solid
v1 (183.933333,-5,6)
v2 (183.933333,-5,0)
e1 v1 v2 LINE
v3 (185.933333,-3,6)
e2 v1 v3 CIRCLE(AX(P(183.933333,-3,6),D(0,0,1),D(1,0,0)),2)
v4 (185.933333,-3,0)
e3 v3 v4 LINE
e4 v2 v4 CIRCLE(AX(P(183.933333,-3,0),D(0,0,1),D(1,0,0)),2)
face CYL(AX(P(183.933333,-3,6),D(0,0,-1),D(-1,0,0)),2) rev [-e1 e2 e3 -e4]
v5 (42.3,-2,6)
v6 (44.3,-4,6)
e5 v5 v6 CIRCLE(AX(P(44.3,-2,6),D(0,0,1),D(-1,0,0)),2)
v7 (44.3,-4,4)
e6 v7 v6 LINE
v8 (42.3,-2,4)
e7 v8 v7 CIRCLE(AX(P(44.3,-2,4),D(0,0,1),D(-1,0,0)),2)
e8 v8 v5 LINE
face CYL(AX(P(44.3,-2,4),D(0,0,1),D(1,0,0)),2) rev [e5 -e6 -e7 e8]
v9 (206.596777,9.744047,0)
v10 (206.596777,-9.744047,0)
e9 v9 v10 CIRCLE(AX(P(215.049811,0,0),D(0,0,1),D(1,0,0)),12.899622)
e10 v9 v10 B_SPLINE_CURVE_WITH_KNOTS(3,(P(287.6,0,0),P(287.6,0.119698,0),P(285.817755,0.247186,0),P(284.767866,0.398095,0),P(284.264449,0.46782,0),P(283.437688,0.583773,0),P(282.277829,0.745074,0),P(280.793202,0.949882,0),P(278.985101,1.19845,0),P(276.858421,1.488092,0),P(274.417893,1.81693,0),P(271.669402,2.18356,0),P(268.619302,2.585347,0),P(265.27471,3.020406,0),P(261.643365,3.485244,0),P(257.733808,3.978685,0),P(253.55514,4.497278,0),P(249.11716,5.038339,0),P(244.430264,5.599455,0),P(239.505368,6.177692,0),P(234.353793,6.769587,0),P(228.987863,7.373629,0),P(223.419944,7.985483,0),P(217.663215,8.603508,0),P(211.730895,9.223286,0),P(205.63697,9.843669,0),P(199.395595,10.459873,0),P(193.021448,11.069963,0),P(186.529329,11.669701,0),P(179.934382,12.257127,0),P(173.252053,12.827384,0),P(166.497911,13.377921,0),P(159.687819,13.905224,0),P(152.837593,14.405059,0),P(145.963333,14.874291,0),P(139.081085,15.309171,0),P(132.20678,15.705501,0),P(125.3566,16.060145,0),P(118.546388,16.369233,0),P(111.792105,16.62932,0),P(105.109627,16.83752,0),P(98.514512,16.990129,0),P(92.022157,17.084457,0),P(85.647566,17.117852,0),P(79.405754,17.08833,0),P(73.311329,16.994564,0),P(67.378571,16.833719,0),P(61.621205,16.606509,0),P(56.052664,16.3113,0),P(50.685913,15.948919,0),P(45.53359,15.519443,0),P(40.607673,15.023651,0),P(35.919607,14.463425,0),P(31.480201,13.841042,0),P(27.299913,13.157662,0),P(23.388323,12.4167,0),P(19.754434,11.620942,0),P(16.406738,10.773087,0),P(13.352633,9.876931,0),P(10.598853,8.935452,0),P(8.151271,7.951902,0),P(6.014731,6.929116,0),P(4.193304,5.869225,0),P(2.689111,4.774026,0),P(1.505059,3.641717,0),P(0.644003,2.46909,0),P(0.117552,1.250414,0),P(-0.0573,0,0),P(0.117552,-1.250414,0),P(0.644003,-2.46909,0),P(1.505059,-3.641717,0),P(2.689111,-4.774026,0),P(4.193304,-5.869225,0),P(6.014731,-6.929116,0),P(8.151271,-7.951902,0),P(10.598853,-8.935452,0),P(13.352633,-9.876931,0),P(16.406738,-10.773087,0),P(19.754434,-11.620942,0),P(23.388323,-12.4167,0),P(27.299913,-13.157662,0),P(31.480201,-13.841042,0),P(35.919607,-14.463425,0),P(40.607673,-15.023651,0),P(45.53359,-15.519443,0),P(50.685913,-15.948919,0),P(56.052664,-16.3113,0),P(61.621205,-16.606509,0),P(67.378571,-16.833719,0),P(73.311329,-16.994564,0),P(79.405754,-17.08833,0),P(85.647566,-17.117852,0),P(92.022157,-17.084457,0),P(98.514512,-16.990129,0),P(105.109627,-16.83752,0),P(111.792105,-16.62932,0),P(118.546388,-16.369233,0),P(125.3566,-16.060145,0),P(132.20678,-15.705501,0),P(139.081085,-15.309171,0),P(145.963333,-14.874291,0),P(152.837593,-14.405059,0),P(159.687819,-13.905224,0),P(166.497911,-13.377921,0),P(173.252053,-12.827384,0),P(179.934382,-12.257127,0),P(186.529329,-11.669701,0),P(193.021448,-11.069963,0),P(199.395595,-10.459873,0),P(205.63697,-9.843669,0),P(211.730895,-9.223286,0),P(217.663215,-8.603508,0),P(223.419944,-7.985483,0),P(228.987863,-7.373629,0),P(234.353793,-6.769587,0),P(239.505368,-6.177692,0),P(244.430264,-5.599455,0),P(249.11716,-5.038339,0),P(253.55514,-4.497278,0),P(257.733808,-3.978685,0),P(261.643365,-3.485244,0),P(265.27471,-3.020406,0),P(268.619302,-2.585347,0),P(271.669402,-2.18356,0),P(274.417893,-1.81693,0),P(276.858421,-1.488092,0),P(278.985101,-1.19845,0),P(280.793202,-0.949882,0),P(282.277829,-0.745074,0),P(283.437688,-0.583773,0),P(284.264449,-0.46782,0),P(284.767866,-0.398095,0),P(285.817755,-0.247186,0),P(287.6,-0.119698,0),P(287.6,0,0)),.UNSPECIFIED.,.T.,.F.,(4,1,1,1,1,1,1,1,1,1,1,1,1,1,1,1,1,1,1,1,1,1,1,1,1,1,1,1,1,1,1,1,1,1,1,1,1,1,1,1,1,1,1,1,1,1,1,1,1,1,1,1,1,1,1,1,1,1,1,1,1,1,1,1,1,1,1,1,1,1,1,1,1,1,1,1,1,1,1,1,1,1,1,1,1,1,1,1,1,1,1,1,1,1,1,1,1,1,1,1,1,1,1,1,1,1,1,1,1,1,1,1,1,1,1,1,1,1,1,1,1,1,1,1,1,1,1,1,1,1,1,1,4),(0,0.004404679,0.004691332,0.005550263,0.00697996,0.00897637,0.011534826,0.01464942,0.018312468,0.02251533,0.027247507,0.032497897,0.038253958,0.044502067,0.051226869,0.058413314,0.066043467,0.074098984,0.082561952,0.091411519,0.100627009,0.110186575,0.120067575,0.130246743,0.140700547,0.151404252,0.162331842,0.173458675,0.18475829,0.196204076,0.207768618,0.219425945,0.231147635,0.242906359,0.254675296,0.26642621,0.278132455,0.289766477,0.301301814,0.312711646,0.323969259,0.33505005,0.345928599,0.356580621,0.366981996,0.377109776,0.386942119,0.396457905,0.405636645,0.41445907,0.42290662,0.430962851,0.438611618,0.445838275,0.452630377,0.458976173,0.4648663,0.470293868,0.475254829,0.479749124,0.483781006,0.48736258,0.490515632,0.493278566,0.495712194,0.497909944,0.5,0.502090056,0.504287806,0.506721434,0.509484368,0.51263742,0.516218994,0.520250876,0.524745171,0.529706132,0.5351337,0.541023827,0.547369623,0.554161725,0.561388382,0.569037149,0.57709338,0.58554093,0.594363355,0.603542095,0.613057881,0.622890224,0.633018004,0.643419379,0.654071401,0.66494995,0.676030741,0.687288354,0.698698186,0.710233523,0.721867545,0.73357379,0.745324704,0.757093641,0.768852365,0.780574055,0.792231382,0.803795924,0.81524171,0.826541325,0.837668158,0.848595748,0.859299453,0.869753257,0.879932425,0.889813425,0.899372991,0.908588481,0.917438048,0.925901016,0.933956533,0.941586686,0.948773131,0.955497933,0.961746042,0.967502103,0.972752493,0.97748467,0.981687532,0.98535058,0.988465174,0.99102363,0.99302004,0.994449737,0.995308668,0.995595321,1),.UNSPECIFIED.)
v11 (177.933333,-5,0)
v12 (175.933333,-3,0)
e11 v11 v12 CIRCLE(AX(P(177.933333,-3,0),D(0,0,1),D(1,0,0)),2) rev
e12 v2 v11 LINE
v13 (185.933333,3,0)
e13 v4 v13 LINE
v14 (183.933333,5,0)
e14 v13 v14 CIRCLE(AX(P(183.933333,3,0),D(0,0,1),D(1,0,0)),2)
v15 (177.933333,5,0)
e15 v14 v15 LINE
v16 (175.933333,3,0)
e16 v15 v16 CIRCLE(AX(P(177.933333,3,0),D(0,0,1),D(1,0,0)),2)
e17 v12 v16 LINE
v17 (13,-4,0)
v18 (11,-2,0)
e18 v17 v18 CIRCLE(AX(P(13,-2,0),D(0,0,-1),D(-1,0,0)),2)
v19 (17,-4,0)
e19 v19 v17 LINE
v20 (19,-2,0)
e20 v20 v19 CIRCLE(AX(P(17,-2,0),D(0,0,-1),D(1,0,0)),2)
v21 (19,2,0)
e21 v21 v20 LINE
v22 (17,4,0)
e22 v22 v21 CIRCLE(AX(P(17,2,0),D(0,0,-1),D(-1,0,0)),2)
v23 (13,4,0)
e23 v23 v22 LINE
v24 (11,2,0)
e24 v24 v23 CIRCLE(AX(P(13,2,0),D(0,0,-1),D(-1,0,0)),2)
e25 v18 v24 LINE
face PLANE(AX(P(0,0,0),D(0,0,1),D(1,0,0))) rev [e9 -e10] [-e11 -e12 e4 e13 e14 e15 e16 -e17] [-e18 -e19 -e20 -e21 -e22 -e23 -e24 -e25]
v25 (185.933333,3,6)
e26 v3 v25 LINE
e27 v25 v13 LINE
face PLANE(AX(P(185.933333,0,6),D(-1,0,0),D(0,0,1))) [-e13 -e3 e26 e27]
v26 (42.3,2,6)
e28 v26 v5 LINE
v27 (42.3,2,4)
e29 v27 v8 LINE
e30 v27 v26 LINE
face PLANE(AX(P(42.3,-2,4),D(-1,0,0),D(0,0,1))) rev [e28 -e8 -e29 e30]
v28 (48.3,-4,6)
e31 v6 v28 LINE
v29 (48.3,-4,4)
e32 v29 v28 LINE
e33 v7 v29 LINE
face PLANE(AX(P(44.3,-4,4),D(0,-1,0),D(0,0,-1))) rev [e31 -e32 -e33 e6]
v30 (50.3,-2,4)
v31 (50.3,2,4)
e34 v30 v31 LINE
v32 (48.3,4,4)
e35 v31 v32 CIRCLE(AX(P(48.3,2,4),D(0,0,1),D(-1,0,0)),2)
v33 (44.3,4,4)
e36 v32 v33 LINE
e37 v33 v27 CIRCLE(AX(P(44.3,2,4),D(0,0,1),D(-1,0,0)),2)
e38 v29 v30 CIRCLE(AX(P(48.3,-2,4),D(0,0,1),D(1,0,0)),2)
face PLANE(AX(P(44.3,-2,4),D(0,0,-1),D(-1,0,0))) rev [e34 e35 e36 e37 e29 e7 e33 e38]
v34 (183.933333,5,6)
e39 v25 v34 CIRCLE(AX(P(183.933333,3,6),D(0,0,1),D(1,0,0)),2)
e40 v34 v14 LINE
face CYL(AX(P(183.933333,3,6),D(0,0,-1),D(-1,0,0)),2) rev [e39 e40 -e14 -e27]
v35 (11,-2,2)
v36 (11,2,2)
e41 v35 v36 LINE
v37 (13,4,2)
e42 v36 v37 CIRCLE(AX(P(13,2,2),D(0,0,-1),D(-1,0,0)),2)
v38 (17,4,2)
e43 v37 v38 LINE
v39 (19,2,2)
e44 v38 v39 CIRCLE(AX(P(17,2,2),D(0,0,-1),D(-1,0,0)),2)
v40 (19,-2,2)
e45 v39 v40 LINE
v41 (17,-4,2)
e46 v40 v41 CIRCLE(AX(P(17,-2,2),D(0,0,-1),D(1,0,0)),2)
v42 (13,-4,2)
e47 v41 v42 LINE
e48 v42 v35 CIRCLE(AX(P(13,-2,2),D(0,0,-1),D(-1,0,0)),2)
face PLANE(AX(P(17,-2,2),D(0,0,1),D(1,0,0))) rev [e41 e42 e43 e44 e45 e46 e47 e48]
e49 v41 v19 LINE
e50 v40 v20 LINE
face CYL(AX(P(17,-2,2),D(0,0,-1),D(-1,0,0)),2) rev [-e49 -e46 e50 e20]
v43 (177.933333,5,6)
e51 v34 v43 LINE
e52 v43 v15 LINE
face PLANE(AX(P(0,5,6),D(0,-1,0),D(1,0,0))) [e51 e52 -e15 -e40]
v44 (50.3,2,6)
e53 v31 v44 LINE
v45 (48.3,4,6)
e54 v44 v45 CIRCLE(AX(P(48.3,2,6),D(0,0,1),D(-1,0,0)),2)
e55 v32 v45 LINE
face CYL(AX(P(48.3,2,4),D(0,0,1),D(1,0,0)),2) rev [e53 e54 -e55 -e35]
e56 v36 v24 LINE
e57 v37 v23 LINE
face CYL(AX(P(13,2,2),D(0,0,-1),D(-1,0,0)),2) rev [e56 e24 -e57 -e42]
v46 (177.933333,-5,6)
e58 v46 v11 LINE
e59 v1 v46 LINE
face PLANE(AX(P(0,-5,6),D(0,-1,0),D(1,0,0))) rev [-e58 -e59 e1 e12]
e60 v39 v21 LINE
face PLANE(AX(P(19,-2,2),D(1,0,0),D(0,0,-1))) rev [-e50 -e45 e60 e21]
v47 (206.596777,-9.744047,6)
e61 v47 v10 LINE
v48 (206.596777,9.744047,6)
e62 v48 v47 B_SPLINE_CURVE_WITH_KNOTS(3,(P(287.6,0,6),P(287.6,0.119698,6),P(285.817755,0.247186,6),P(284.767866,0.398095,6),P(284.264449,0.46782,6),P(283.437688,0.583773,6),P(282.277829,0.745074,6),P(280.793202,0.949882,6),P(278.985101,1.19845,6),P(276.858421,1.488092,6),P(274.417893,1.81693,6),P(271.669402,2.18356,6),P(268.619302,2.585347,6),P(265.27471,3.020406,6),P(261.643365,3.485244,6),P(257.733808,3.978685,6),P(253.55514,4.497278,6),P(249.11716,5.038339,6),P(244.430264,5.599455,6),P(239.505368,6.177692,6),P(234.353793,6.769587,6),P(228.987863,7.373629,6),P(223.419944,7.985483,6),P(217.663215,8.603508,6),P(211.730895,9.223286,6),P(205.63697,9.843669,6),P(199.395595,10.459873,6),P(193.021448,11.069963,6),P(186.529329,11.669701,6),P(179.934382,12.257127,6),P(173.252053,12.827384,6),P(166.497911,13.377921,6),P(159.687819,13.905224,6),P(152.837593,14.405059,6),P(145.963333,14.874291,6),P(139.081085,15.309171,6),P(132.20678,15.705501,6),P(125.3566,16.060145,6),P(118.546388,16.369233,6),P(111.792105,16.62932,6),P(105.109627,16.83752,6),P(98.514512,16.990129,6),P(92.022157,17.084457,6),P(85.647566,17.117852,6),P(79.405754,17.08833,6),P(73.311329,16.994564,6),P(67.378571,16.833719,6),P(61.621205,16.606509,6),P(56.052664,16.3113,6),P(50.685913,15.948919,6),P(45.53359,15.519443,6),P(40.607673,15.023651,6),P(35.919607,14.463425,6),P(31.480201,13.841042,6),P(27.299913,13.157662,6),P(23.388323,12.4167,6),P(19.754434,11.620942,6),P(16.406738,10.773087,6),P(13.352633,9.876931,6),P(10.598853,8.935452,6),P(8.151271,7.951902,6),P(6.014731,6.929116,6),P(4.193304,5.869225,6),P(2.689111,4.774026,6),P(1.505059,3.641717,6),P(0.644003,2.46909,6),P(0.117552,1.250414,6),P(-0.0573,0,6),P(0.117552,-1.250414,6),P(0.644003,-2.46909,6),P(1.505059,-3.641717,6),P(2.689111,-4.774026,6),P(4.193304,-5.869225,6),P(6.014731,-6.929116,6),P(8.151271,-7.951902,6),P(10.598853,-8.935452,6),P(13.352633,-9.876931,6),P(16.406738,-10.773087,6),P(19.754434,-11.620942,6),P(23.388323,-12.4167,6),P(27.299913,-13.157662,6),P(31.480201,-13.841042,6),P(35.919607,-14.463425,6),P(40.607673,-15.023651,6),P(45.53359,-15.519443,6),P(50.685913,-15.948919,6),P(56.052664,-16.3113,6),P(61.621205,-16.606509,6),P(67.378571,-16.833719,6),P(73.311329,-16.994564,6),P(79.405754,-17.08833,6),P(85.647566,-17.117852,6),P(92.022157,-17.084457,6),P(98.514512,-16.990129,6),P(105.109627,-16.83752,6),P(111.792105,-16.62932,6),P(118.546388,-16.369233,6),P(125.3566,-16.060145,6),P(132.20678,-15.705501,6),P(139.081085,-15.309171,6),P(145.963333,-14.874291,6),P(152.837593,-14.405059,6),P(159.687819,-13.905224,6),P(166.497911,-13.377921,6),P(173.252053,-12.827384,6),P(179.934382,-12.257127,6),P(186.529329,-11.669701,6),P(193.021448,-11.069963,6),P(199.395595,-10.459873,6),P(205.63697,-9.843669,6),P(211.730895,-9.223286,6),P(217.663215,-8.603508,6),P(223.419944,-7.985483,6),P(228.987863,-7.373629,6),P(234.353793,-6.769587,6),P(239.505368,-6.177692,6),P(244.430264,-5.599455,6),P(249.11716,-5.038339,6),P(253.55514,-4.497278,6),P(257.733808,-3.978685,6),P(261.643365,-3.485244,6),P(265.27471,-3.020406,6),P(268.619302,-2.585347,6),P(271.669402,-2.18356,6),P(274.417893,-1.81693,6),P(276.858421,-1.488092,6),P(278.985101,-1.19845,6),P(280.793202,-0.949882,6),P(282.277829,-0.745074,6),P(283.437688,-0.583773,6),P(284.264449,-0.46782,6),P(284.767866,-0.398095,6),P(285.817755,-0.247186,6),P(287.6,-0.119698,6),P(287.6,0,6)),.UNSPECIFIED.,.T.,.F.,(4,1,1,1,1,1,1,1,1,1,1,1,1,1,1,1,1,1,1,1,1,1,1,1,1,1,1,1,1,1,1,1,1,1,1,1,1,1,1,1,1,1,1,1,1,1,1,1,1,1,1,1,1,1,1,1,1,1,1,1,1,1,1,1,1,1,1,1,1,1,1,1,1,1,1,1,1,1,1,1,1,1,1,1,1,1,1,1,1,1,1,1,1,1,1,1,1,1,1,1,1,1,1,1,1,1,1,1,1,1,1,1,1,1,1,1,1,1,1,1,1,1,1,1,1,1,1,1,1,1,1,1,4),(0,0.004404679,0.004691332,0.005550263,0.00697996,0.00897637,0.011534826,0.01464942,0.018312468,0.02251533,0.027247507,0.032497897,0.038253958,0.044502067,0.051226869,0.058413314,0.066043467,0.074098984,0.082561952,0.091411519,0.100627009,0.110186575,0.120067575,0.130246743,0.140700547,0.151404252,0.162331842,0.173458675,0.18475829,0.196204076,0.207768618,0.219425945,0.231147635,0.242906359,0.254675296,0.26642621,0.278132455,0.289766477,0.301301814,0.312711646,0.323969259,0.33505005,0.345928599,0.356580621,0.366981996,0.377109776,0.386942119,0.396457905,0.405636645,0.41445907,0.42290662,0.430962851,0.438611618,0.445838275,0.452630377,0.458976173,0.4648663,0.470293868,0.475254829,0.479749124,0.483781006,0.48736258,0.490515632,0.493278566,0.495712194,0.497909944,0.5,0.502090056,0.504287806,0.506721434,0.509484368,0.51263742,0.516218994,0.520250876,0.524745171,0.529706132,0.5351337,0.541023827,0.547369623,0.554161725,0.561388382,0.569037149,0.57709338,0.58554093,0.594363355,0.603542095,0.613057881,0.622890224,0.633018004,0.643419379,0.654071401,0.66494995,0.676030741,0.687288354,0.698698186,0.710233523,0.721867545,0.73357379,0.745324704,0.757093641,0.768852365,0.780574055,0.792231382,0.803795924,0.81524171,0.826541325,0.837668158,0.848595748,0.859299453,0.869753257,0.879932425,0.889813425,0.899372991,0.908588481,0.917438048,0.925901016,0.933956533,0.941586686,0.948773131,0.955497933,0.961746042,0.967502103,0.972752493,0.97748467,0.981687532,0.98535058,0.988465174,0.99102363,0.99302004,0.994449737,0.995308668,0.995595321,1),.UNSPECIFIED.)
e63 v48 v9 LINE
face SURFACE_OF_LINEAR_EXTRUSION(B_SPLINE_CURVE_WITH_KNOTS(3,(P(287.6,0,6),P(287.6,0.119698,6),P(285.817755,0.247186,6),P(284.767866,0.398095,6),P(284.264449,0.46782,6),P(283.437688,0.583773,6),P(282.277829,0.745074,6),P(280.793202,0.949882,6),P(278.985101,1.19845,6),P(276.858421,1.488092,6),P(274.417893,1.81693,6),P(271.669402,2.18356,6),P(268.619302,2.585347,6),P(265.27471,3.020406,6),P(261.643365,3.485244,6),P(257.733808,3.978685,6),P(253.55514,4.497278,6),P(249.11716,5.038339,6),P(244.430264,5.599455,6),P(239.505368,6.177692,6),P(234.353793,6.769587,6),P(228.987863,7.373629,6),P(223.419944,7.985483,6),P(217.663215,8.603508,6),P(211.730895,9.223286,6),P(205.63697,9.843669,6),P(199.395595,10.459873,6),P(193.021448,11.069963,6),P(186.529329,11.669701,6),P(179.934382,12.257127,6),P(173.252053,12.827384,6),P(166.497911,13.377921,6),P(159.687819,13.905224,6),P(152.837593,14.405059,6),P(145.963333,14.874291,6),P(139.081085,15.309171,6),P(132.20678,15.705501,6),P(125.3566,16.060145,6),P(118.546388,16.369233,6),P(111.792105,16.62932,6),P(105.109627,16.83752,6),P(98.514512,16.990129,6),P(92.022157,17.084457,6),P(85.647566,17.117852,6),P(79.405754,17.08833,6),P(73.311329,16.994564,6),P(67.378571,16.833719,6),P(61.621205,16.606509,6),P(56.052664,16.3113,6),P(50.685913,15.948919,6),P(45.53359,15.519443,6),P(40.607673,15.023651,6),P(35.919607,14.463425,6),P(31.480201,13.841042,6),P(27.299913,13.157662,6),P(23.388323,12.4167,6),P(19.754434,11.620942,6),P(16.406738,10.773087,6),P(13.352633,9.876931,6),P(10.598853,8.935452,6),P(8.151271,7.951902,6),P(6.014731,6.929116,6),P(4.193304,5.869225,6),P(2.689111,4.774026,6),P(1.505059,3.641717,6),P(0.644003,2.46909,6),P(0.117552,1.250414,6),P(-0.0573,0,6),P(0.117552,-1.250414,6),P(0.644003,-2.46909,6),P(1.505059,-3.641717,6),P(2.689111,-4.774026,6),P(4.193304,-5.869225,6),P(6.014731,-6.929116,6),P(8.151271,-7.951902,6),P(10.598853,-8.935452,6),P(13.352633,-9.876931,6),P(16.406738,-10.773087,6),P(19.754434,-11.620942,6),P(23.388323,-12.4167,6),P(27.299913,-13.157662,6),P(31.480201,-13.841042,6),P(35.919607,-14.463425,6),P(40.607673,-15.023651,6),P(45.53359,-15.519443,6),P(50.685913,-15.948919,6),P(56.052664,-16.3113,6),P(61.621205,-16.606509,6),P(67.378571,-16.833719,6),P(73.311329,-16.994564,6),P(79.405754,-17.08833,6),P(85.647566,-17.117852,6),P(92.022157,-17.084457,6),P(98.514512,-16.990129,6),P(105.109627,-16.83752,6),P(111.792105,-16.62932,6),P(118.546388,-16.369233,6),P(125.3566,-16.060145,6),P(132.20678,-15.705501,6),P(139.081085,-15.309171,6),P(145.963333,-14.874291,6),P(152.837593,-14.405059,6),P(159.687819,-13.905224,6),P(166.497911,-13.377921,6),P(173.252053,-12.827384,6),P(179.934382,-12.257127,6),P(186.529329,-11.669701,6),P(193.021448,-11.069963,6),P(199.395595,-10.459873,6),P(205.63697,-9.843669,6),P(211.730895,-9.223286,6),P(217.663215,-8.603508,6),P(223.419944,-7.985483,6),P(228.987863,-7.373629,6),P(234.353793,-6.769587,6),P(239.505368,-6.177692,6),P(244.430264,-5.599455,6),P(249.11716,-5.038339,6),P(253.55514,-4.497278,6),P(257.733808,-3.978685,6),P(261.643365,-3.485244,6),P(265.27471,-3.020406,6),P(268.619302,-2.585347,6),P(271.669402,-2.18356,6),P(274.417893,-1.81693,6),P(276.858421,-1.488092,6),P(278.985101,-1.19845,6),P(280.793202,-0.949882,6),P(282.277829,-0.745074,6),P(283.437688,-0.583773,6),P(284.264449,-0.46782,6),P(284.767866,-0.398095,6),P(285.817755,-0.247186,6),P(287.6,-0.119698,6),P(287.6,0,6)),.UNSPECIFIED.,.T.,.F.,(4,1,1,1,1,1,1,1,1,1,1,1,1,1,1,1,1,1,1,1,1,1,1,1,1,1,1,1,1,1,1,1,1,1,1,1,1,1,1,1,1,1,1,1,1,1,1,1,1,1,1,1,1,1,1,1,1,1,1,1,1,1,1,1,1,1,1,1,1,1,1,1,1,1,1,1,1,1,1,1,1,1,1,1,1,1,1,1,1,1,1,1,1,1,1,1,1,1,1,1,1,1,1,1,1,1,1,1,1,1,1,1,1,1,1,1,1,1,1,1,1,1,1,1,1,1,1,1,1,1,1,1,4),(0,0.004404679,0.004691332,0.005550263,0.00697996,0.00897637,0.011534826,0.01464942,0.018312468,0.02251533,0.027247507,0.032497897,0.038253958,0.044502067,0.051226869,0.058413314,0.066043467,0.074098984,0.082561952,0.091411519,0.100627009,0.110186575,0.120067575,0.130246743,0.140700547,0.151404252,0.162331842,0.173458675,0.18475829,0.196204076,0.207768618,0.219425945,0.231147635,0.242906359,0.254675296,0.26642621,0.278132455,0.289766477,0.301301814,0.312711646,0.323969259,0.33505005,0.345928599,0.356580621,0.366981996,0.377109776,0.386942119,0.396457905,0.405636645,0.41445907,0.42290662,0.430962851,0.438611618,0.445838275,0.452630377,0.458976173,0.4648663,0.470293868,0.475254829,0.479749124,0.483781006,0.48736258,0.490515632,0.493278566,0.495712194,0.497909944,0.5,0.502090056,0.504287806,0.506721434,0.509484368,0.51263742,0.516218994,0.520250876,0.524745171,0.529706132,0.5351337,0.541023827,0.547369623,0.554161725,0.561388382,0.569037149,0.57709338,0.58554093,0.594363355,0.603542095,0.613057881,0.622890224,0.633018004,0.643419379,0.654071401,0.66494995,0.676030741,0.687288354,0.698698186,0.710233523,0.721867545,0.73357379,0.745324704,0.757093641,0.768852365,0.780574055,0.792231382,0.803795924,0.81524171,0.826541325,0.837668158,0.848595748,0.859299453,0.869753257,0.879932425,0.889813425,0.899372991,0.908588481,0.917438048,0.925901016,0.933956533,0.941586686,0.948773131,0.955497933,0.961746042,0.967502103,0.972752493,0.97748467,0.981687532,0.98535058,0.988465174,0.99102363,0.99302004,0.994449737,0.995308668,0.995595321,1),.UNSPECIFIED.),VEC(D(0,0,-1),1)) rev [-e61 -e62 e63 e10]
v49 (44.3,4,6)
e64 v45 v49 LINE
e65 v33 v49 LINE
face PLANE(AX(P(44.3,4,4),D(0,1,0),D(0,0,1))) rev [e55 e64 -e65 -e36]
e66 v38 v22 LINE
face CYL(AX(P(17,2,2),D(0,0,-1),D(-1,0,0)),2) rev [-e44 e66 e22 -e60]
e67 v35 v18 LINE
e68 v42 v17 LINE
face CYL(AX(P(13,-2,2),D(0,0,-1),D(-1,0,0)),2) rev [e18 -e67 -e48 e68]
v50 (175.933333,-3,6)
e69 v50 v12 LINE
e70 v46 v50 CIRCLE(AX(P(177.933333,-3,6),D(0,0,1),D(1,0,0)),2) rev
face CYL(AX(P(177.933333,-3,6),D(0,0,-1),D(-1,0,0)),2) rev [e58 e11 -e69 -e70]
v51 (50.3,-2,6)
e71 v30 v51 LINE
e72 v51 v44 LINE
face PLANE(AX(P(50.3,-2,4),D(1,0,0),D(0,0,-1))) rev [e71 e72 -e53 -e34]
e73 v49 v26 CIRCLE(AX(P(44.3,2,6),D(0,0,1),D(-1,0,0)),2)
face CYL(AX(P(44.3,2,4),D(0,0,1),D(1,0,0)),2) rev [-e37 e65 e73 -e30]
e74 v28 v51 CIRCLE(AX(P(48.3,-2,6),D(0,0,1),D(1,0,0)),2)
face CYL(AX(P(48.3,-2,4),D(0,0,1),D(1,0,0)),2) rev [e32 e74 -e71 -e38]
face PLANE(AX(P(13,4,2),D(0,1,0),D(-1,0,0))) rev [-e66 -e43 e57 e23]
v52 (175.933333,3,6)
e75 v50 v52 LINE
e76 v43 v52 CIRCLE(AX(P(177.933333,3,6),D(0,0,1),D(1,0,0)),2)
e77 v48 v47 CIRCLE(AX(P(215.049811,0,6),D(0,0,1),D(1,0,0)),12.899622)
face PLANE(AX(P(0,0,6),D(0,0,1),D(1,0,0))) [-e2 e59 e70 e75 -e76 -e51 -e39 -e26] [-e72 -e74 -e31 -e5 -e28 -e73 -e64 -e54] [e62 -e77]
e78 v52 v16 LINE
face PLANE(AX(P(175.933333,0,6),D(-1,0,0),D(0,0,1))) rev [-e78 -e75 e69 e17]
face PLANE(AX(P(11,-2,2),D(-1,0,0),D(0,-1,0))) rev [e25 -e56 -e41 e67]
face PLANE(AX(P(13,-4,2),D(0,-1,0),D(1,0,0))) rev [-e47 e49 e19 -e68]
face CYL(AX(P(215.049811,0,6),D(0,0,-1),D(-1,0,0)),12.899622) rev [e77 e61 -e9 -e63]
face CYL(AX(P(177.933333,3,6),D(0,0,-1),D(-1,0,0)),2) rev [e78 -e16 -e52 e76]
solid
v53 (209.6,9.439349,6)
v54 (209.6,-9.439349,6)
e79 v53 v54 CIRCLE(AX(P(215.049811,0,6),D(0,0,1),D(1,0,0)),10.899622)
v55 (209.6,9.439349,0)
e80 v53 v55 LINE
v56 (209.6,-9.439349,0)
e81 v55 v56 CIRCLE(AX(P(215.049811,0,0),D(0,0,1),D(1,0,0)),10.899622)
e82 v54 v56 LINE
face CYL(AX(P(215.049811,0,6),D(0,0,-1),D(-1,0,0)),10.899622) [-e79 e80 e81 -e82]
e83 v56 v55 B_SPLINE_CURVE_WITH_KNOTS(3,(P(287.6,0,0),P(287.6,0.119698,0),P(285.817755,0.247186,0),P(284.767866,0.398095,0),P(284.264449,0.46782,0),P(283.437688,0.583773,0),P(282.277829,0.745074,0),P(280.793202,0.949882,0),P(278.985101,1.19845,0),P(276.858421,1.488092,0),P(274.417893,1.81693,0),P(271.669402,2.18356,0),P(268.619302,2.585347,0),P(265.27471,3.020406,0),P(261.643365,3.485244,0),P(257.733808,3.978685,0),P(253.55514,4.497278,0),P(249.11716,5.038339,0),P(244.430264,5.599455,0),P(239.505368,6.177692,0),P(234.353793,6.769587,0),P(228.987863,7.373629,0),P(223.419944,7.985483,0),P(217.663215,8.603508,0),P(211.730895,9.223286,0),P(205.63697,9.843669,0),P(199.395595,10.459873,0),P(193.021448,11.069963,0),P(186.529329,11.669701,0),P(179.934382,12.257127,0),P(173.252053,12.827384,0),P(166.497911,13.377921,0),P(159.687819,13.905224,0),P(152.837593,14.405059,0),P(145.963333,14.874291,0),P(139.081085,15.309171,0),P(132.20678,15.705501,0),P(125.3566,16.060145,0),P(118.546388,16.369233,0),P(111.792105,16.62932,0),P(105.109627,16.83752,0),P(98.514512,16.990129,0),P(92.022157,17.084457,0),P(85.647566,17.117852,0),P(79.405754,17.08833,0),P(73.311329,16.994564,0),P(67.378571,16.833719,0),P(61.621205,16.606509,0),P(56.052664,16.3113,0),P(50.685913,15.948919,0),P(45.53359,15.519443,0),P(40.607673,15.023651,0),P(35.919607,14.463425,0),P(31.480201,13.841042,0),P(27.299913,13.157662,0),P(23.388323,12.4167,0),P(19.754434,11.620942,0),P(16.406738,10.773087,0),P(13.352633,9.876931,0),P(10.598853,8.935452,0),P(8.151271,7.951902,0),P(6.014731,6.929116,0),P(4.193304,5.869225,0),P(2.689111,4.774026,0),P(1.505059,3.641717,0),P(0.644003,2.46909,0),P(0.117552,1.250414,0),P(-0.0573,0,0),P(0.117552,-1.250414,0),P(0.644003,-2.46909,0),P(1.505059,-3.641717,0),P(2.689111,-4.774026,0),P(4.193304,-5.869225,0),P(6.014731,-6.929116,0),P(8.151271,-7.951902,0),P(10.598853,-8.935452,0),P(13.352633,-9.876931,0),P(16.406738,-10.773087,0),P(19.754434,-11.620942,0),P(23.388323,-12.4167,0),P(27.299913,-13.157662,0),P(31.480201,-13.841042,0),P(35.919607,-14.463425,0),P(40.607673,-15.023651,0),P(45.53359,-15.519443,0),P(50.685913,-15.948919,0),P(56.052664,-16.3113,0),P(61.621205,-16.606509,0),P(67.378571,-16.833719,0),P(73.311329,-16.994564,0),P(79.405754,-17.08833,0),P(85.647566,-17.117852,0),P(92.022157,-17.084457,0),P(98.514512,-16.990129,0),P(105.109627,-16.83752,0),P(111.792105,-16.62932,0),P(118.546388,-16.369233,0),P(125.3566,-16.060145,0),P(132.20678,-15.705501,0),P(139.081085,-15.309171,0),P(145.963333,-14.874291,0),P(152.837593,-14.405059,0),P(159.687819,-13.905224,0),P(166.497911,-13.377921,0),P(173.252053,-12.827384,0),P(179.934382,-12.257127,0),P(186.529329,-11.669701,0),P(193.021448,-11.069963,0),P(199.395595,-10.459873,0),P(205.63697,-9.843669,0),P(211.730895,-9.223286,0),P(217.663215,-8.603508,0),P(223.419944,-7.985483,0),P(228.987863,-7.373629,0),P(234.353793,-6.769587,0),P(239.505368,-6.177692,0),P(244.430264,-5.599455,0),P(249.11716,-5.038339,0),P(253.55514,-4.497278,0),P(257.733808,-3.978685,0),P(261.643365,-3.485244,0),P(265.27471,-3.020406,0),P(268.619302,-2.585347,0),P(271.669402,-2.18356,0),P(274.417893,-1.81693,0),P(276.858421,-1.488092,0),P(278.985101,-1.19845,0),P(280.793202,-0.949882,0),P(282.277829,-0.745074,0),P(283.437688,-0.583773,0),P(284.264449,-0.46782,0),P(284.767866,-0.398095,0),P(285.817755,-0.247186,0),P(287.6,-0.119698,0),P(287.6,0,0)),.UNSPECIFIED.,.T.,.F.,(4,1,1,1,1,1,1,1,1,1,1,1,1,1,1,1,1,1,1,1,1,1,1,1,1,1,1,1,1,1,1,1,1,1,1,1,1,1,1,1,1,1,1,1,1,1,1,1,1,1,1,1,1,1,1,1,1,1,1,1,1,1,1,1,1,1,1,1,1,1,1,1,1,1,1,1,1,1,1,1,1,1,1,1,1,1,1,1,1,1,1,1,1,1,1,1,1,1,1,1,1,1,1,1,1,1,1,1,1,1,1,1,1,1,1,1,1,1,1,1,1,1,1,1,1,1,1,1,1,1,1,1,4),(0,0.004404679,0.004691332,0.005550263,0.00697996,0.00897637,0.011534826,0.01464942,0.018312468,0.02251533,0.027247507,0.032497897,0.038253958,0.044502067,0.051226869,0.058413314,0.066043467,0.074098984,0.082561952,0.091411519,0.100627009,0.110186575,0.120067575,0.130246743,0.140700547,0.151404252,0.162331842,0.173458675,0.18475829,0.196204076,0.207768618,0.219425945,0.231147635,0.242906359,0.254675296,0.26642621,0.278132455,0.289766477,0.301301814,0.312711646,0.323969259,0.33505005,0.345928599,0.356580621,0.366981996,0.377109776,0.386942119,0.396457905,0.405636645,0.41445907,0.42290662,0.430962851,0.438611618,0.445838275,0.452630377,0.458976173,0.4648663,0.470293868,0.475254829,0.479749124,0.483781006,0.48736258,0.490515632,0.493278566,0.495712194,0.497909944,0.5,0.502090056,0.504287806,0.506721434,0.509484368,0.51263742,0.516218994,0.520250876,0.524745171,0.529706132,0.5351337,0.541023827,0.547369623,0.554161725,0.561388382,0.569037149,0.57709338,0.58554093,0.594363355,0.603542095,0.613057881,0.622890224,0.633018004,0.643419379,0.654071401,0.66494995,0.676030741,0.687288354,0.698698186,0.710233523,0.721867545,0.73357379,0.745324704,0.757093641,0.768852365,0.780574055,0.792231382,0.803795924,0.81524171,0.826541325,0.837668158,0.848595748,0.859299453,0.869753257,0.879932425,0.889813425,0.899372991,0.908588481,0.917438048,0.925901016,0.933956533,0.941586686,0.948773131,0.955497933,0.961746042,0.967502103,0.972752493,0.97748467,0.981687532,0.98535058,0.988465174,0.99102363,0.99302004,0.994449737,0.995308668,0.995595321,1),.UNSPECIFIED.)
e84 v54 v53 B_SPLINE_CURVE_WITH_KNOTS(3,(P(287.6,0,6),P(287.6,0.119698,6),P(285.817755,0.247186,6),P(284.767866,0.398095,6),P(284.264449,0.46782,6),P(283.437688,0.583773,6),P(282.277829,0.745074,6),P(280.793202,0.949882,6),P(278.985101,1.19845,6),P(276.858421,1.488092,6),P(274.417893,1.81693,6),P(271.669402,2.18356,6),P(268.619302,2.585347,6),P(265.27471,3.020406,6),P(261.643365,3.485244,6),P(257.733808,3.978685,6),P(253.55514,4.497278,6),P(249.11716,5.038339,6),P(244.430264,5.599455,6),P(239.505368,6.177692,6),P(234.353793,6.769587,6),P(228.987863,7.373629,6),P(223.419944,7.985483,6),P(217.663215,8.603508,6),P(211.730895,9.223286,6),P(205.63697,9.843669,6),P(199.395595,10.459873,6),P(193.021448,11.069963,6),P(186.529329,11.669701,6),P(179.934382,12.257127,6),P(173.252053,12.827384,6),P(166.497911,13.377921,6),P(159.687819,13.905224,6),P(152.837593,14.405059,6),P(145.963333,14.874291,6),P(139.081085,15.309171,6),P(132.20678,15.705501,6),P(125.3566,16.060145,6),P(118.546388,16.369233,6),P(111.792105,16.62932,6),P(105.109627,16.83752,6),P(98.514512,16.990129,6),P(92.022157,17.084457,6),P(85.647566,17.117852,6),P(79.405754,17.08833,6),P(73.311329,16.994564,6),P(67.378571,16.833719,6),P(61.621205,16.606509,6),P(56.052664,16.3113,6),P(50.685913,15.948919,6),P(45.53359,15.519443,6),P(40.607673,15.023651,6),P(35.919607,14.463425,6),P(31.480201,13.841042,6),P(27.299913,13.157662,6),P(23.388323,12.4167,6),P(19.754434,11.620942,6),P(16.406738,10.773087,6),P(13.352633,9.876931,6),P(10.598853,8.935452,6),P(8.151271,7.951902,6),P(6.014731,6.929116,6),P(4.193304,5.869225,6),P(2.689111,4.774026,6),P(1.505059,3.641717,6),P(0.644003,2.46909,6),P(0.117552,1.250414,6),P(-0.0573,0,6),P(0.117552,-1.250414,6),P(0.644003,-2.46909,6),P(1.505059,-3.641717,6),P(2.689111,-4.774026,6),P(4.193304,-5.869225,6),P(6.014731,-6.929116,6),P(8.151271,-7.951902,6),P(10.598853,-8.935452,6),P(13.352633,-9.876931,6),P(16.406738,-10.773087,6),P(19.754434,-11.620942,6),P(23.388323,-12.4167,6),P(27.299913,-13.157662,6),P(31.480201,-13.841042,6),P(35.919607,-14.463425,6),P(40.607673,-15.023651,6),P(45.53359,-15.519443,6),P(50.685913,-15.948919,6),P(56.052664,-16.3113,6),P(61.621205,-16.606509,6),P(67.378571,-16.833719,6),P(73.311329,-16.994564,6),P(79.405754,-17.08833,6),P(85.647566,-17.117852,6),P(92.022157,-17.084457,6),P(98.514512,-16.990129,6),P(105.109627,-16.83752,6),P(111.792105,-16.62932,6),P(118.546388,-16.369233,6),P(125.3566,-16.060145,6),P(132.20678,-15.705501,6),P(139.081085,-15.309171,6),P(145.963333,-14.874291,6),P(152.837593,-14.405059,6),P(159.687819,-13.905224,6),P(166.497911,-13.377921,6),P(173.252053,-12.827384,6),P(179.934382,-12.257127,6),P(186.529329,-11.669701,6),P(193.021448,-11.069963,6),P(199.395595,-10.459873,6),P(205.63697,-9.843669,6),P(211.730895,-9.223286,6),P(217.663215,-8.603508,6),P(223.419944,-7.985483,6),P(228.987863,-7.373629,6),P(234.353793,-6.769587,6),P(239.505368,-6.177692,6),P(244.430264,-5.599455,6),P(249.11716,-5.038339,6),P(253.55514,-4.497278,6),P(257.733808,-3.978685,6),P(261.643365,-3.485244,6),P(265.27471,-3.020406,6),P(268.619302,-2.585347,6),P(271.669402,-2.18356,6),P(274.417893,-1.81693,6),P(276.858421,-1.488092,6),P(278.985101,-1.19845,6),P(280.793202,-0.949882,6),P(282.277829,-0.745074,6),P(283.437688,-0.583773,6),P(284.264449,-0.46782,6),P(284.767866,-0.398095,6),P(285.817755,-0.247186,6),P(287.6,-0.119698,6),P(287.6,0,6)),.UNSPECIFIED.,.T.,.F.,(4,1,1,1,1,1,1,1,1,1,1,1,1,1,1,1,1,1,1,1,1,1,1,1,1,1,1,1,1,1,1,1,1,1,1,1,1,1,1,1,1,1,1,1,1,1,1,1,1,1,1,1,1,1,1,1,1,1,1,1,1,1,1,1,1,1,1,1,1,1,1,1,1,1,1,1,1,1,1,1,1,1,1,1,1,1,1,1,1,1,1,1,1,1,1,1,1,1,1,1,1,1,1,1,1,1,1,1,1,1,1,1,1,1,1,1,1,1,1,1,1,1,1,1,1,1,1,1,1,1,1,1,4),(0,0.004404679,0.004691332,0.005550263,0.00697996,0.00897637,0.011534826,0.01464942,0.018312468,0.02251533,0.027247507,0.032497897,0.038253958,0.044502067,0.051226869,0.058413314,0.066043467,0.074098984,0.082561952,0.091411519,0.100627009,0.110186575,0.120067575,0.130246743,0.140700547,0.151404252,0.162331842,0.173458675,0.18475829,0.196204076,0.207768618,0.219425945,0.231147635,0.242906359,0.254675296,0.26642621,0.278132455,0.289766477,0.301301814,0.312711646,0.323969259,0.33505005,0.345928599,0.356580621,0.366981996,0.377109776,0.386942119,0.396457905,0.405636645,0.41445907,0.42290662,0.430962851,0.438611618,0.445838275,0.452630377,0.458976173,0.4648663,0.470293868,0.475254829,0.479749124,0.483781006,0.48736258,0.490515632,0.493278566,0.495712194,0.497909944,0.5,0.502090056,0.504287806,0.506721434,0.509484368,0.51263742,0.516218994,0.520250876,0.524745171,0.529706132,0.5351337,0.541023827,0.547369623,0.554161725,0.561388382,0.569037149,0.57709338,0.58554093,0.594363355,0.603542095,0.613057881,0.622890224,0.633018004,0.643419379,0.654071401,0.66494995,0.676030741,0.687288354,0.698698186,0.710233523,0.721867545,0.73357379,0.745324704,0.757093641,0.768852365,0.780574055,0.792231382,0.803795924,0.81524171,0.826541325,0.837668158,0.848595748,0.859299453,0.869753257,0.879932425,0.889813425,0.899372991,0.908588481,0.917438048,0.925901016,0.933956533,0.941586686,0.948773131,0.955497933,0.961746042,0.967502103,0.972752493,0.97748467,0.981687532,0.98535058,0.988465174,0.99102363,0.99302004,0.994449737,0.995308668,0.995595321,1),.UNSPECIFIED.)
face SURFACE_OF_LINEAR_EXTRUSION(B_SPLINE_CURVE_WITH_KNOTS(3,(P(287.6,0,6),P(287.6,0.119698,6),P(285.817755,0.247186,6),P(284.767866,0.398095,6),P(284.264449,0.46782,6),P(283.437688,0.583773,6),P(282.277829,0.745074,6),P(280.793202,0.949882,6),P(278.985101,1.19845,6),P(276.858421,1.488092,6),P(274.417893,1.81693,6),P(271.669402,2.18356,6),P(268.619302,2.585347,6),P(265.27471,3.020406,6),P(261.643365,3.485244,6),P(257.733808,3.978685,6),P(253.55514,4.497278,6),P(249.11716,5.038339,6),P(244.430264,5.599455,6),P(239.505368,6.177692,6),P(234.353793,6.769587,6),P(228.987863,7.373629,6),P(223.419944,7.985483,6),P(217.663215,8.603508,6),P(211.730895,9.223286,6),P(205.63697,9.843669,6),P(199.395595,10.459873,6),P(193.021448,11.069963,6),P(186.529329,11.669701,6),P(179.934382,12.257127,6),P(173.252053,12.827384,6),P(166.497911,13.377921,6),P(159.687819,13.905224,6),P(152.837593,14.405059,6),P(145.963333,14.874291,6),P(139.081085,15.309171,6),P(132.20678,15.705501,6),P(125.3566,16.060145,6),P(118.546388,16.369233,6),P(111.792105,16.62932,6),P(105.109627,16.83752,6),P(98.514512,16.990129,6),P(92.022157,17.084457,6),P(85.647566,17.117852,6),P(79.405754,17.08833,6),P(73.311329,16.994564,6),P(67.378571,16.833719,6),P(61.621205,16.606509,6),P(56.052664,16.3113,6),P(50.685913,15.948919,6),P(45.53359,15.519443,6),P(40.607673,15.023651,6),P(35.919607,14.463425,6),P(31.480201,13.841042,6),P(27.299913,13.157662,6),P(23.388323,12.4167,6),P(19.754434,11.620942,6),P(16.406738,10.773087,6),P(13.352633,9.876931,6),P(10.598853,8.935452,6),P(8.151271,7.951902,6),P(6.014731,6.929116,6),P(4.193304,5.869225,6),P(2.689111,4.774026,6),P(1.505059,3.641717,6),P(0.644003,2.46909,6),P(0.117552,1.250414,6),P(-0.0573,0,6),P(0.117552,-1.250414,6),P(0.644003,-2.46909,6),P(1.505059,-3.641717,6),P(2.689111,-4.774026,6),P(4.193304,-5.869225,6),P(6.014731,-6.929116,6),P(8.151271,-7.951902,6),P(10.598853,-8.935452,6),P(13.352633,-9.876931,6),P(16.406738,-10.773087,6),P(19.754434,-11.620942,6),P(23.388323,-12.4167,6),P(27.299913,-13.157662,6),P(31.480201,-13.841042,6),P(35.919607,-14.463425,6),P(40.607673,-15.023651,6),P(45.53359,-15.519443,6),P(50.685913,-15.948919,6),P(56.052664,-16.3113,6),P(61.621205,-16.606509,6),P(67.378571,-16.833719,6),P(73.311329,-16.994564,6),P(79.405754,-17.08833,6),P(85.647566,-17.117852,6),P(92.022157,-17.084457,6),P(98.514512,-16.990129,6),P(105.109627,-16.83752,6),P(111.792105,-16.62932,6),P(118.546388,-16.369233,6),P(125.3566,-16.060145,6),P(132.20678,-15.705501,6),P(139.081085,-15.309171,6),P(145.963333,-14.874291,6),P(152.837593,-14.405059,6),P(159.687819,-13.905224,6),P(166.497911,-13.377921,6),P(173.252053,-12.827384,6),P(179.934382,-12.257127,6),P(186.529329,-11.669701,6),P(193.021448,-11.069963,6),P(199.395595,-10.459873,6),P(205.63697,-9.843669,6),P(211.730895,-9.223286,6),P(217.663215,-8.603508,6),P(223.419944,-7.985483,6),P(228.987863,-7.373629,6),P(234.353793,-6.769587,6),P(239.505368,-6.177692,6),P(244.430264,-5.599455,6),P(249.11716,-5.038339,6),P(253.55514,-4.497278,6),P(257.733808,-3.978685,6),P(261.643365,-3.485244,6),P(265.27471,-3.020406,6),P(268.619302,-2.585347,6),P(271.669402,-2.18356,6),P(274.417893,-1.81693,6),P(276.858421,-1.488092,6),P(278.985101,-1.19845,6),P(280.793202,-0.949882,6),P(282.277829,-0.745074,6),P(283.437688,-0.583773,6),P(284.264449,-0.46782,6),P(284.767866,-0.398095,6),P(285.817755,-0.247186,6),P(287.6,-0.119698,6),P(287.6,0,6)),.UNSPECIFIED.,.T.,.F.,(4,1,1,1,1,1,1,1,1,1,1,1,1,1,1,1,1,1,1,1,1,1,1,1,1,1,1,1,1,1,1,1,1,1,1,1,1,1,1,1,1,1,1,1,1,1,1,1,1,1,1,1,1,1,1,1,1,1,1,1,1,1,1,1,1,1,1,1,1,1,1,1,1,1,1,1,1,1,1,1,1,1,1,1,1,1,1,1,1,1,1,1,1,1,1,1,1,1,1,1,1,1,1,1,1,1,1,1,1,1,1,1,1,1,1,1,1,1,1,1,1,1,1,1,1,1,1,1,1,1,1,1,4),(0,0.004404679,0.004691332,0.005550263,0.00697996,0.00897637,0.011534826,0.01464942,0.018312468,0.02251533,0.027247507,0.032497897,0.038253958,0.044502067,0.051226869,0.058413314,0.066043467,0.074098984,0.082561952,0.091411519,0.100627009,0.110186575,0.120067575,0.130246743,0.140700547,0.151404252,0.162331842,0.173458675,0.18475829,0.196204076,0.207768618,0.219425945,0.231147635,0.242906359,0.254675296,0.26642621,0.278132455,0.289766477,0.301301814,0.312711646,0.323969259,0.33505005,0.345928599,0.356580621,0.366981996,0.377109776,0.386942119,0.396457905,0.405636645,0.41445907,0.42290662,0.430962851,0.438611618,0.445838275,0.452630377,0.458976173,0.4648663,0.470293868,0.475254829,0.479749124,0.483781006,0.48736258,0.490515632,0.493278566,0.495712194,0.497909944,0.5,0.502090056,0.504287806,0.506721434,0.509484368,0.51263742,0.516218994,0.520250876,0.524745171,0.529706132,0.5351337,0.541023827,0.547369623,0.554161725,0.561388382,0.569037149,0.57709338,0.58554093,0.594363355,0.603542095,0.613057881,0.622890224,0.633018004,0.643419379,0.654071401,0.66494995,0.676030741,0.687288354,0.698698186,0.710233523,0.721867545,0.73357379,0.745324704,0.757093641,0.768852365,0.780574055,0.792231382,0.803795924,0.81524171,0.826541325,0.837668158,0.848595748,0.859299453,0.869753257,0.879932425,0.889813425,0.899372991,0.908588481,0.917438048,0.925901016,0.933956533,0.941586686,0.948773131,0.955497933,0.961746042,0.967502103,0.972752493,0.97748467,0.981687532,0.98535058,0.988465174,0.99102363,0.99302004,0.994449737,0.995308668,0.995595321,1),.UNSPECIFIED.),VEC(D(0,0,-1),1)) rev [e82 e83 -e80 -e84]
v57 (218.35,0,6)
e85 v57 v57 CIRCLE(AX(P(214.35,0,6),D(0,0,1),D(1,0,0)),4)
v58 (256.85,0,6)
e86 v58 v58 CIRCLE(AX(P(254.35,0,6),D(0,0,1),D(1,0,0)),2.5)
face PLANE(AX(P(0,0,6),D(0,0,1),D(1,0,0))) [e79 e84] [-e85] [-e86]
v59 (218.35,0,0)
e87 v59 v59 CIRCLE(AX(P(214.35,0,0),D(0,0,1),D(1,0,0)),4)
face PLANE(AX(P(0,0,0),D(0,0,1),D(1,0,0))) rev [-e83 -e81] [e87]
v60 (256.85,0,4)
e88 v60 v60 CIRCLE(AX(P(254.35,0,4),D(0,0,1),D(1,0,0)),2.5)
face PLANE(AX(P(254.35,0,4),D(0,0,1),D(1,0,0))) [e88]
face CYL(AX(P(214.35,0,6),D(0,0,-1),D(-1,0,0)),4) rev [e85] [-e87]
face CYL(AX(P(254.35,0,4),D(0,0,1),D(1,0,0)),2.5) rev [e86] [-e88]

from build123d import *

# Parameters (mm, degrees)
RESSALTO_EXTRUS_O1_OUTLINE_R = 4
RESSALTO_EXTRUS_O1_DEPTH     = 6
CORTE_EXTRUS_O1_DEPTH        = 2
CORTE_EXTRUS_O2_DEPTH        = 2
ESBO_O5_R                    = 2.5
CORTE_EXTRUS_O3_DEPTH        = 2


# Read off the part's stored shape, not the designer's step: Ressalto-extrusão1
with BuildPart() as part:
    # Ressalto-extrusão1 outline → Ressalto-extrusão1 (new body)
    # profile 1 of 2: a face of its own
    with BuildSketch(Plane.XY):
        with BuildLine():
            add(Edge.make_bspline(
                [(206.59677672, 9.744047278), (206.292944708, 9.774653635), (203.907329388, 10.014434574), (199.39559532, 10.459873108), (193.021447659, 11.069962818), (186.529328525, 11.669700875), (179.934382421, 12.257126539), (173.252052511, 12.827383605), (166.497911298, 13.377921429), (159.687818769, 13.905224154), (152.837593287, 14.405058832), (145.963333172, 14.874290612), (139.081085422, 15.309171286), (132.20678029, 15.70550096), (125.35660044, 16.060145436), (118.546388357, 16.369233), (111.792105265, 16.629320446), (105.10962701, 16.837520337), (98.514511855, 16.990129218), (92.022156597, 17.084456768), (85.647566419, 17.117851746), (79.405754471, 17.088329774), (73.311328939, 16.994563536), (67.378571016, 16.833719315), (61.62120467, 16.606508882), (56.052663957, 16.311299689), (50.685913151, 15.948919147), (45.533589734, 15.519442809), (40.60767255, 15.02365128), (35.919607131, 14.463425319), (31.480201299, 13.841042083), (27.299913239, 13.157661743), (23.388323375, 12.416699746), (19.754434178, 11.620942186), (16.40673833, 10.773086642), (13.352633209, 9.876931334), (10.598853103, 8.935452398), (8.151270602, 7.951901503), (6.014730805, 6.929116001), (4.1933041, 5.869225283), (2.689111463, 4.774026072), (1.505059401, 3.641716827), (0.644003291, 2.469089904), (0.117552225, 1.250413641), (-0.057299877, 0), (0.117552225, -1.250413641), (0.644003291, -2.469089904), (1.505059401, -3.641716827), (2.689111463, -4.774026072), (4.1933041, -5.869225283), (6.014730805, -6.929116001), (8.151270602, -7.951901503), (10.598853103, -8.935452398), (13.352633209, -9.876931334), (16.40673833, -10.773086642), (19.754434178, -11.620942186), (23.388323375, -12.416699746), (27.299913239, -13.157661743), (31.480201299, -13.841042083), (35.919607131, -14.463425319), (40.60767255, -15.02365128), (45.533589734, -15.519442809), (50.685913151, -15.948919147), (56.052663957, -16.311299689), (61.62120467, -16.606508882), (67.378571016, -16.833719315), (73.311328939, -16.994563536), (79.405754471, -17.088329774), (85.647566419, -17.117851746), (92.022156597, -17.084456768), (98.514511855, -16.990129218), (105.10962701, -16.837520337), (111.792105265, -16.629320446), (118.546388357, -16.369233), (125.35660044, -16.060145436), (132.20678029, -15.70550096), (139.081085422, -15.309171286), (145.963333172, -14.874290612), (152.837593287, -14.405058832), (159.687818769, -13.905224154), (166.497911298, -13.377921429), (173.252052511, -12.827383605), (179.934382421, -12.257126539), (186.529328525, -11.669700875), (193.021447659, -11.069962818), (199.39559532, -10.459873108), (203.907329388, -10.014434574), (206.292944708, -9.774653635), (206.59677672, -9.744047278)],
                knots=[0.139138323, 0.139138323, 0.139138323, 0.139138323, 0.140700547, 0.151404252, 0.162331842, 0.173458675, 0.18475829, 0.196204076, 0.207768618, 0.219425945, 0.231147635, 0.242906359, 0.254675296, 0.26642621, 0.278132455, 0.289766477, 0.301301814, 0.312711646, 0.323969259, 0.33505005, 0.345928599, 0.356580621, 0.366981996, 0.377109776, 0.386942119, 0.396457905, 0.405636645, 0.41445907, 0.42290662, 0.430962851, 0.438611618, 0.445838275, 0.452630377, 0.458976173, 0.4648663, 0.470293868, 0.475254829, 0.479749124, 0.483781006, 0.48736258, 0.490515632, 0.493278566, 0.495712194, 0.497909944, 0.5, 0.502090056, 0.504287806, 0.506721434, 0.509484368, 0.51263742, 0.516218994, 0.520250876, 0.524745171, 0.529706132, 0.5351337, 0.541023827, 0.547369623, 0.554161725, 0.561388382, 0.569037149, 0.57709338, 0.58554093, 0.594363355, 0.603542095, 0.613057881, 0.622890224, 0.633018004, 0.643419379, 0.654071401, 0.66494995, 0.676030741, 0.687288354, 0.698698186, 0.710233523, 0.721867545, 0.73357379, 0.745324704, 0.757093641, 0.768852365, 0.780574055, 0.792231382, 0.803795924, 0.81524171, 0.826541325, 0.837668158, 0.848595748, 0.859299453, 0.860861677, 0.860861677, 0.860861677, 0.860861677], degree=3))
            ThreePointArc((206.59677672, -9.744047278), (202.150189054, 0), (206.59677672, 9.744047278))
        make_face()
        with BuildLine():
            Line((175.933333333, -3), (175.933333333, 3))
            ThreePointArc((175.933333333, 3), (176.519119771, 4.414213562), (177.933333333, 5))
            Line((177.933333333, 5), (183.933333333, 5))
            ThreePointArc((183.933333333, 5), (185.347546896, 4.414213563), (185.933333333, 3))
            Line((185.933333333, 3), (185.933333333, -3))
            ThreePointArc((185.933333333, -3), (185.347546896, -4.414213563), (183.933333333, -5))
            Line((183.933333333, -5), (177.933333333, -5))
            ThreePointArc((177.933333333, -5), (176.519119771, -4.414213562), (175.933333333, -3))
        make_face(mode=Mode.SUBTRACT)
    # profile 2 of 2: a face of its own
    with BuildSketch(Plane.XY):
        with BuildLine():
            ThreePointArc((209.6, 9.439349451), (204.150189054, 0), (209.6, -9.439349451))
            add(Edge.make_bspline(
                [(209.6, -9.439349451), (210.32804405, -9.364968071), (213.035379881, -9.087000325), (217.663214551, -8.603508067), (223.419943837, -7.985483384), (228.987863488, -7.373628638), (234.353792881, -6.769587119), (239.5053681, -6.177691953), (244.430264247, -5.599454736), (249.117159969, -5.038339365), (253.555140371, -4.49727783), (257.733807871, -3.97868529), (261.643364865, -3.485243955), (265.274709704, -3.020406095), (268.619301696, -2.585347237), (271.669401999, -2.183559584), (274.417893217, -1.816930381), (276.858420544, -1.488091926), (278.98510147, -1.198450267), (280.793202236, -0.949881536), (282.277829485, -0.74507406), (283.43768813, -0.583773245), (284.264448894, -0.467820009), (284.767865992, -0.398094711), (285.817754553, -0.247185692), (287.6, -0.119697914), (287.6, 0), (287.6, 0.119697914), (285.817754553, 0.247185692), (284.767865992, 0.398094711), (284.264448894, 0.467820009), (283.43768813, 0.583773245), (282.277829485, 0.74507406), (280.793202236, 0.949881536), (278.98510147, 1.198450267), (276.858420544, 1.488091926), (274.417893217, 1.816930381), (271.669401999, 2.183559584), (268.619301696, 2.585347237), (265.274709704, 3.020406095), (261.643364865, 3.485243955), (257.733807871, 3.97868529), (253.555140371, 4.49727783), (249.117159969, 5.038339365), (244.430264247, 5.599454736), (239.5053681, 6.177691953), (234.353792881, 6.769587119), (228.987863488, 7.373628638), (223.419943837, 7.985483384), (217.663214551, 8.603508067), (213.035379881, 9.087000325), (210.32804405, 9.364968071), (209.6, 9.439349451)],
                knots=[0.866009309, 0.866009309, 0.866009309, 0.866009309, 0.869753257, 0.879932425, 0.889813425, 0.899372991, 0.908588481, 0.917438048, 0.925901016, 0.933956533, 0.941586686, 0.948773131, 0.955497933, 0.961746042, 0.967502103, 0.972752493, 0.97748467, 0.981687532, 0.98535058, 0.988465174, 0.99102363, 0.99302004, 0.994449737, 0.995308668, 0.995595321, 1, 1, 1, 1.004404679, 1.004691332, 1.005550263, 1.00697996, 1.00897637, 1.011534826, 1.01464942, 1.018312468, 1.02251533, 1.027247507, 1.032497897, 1.038253958, 1.044502067, 1.051226869, 1.058413314, 1.066043467, 1.074098984, 1.082561952, 1.091411519, 1.100627009, 1.110186575, 1.120067575, 1.130246743, 1.133990691, 1.133990691, 1.133990691, 1.133990691], degree=3))
        make_face()
        with Locations((214.35, 0)):
            Circle(RESSALTO_EXTRUS_O1_OUTLINE_R, mode=Mode.SUBTRACT)
    extrude(amount=RESSALTO_EXTRUS_O1_DEPTH)

    # Esboço3 → Corte-extrusão1 (cut)
    with BuildSketch(Plane(origin=(0, 0, 0), x_dir=(-1, 0, 0), z_dir=(0, 0, -1))):
        with BuildLine():
            Line((-13, -4), (-17, -4))
            ThreePointArc((-17, -4), (-18.414213562, -3.414213562), (-19, -2))
            Line((-19, -2), (-19, 2))
            ThreePointArc((-19, 2), (-18.414213562, 3.414213562), (-17, 4))
            Line((-17, 4), (-13, 4))
            ThreePointArc((-13, 4), (-11.585786438, 3.414213562), (-11, 2))
            Line((-11, 2), (-11, -2))
            ThreePointArc((-11, -2), (-11.585786438, -3.414213562), (-13, -4))
        make_face()
    extrude(amount=-CORTE_EXTRUS_O1_DEPTH, mode=Mode.SUBTRACT)

    # Esboço4 → Corte-extrusão2 (cut)
    with BuildSketch(Plane.XY.offset(6)):
        with BuildLine():
            Line((44.3, -4), (48.3, -4))
            ThreePointArc((48.3, -4), (49.714213562, -3.414213562), (50.3, -2))
            Line((50.3, -2), (50.3, 2))
            ThreePointArc((50.3, 2), (49.714213562, 3.414213562), (48.3, 4))
            Line((48.3, 4), (44.3, 4))
            ThreePointArc((44.3, 4), (42.885786438, 3.414213562), (42.3, 2))
            Line((42.3, 2), (42.3, -2))
            ThreePointArc((42.3, -2), (42.885786438, -3.414213562), (44.3, -4))
        make_face()
    extrude(amount=-CORTE_EXTRUS_O2_DEPTH, mode=Mode.SUBTRACT)

    # Esboço5 → Corte-extrusão3 (cut)
    with BuildSketch(Plane.XY.offset(6)):
        with Locations((254.35, 0)):
            Circle(ESBO_O5_R)
    extrude(amount=-CORTE_EXTRUS_O3_DEPTH, mode=Mode.SUBTRACT)


solid = part.part
